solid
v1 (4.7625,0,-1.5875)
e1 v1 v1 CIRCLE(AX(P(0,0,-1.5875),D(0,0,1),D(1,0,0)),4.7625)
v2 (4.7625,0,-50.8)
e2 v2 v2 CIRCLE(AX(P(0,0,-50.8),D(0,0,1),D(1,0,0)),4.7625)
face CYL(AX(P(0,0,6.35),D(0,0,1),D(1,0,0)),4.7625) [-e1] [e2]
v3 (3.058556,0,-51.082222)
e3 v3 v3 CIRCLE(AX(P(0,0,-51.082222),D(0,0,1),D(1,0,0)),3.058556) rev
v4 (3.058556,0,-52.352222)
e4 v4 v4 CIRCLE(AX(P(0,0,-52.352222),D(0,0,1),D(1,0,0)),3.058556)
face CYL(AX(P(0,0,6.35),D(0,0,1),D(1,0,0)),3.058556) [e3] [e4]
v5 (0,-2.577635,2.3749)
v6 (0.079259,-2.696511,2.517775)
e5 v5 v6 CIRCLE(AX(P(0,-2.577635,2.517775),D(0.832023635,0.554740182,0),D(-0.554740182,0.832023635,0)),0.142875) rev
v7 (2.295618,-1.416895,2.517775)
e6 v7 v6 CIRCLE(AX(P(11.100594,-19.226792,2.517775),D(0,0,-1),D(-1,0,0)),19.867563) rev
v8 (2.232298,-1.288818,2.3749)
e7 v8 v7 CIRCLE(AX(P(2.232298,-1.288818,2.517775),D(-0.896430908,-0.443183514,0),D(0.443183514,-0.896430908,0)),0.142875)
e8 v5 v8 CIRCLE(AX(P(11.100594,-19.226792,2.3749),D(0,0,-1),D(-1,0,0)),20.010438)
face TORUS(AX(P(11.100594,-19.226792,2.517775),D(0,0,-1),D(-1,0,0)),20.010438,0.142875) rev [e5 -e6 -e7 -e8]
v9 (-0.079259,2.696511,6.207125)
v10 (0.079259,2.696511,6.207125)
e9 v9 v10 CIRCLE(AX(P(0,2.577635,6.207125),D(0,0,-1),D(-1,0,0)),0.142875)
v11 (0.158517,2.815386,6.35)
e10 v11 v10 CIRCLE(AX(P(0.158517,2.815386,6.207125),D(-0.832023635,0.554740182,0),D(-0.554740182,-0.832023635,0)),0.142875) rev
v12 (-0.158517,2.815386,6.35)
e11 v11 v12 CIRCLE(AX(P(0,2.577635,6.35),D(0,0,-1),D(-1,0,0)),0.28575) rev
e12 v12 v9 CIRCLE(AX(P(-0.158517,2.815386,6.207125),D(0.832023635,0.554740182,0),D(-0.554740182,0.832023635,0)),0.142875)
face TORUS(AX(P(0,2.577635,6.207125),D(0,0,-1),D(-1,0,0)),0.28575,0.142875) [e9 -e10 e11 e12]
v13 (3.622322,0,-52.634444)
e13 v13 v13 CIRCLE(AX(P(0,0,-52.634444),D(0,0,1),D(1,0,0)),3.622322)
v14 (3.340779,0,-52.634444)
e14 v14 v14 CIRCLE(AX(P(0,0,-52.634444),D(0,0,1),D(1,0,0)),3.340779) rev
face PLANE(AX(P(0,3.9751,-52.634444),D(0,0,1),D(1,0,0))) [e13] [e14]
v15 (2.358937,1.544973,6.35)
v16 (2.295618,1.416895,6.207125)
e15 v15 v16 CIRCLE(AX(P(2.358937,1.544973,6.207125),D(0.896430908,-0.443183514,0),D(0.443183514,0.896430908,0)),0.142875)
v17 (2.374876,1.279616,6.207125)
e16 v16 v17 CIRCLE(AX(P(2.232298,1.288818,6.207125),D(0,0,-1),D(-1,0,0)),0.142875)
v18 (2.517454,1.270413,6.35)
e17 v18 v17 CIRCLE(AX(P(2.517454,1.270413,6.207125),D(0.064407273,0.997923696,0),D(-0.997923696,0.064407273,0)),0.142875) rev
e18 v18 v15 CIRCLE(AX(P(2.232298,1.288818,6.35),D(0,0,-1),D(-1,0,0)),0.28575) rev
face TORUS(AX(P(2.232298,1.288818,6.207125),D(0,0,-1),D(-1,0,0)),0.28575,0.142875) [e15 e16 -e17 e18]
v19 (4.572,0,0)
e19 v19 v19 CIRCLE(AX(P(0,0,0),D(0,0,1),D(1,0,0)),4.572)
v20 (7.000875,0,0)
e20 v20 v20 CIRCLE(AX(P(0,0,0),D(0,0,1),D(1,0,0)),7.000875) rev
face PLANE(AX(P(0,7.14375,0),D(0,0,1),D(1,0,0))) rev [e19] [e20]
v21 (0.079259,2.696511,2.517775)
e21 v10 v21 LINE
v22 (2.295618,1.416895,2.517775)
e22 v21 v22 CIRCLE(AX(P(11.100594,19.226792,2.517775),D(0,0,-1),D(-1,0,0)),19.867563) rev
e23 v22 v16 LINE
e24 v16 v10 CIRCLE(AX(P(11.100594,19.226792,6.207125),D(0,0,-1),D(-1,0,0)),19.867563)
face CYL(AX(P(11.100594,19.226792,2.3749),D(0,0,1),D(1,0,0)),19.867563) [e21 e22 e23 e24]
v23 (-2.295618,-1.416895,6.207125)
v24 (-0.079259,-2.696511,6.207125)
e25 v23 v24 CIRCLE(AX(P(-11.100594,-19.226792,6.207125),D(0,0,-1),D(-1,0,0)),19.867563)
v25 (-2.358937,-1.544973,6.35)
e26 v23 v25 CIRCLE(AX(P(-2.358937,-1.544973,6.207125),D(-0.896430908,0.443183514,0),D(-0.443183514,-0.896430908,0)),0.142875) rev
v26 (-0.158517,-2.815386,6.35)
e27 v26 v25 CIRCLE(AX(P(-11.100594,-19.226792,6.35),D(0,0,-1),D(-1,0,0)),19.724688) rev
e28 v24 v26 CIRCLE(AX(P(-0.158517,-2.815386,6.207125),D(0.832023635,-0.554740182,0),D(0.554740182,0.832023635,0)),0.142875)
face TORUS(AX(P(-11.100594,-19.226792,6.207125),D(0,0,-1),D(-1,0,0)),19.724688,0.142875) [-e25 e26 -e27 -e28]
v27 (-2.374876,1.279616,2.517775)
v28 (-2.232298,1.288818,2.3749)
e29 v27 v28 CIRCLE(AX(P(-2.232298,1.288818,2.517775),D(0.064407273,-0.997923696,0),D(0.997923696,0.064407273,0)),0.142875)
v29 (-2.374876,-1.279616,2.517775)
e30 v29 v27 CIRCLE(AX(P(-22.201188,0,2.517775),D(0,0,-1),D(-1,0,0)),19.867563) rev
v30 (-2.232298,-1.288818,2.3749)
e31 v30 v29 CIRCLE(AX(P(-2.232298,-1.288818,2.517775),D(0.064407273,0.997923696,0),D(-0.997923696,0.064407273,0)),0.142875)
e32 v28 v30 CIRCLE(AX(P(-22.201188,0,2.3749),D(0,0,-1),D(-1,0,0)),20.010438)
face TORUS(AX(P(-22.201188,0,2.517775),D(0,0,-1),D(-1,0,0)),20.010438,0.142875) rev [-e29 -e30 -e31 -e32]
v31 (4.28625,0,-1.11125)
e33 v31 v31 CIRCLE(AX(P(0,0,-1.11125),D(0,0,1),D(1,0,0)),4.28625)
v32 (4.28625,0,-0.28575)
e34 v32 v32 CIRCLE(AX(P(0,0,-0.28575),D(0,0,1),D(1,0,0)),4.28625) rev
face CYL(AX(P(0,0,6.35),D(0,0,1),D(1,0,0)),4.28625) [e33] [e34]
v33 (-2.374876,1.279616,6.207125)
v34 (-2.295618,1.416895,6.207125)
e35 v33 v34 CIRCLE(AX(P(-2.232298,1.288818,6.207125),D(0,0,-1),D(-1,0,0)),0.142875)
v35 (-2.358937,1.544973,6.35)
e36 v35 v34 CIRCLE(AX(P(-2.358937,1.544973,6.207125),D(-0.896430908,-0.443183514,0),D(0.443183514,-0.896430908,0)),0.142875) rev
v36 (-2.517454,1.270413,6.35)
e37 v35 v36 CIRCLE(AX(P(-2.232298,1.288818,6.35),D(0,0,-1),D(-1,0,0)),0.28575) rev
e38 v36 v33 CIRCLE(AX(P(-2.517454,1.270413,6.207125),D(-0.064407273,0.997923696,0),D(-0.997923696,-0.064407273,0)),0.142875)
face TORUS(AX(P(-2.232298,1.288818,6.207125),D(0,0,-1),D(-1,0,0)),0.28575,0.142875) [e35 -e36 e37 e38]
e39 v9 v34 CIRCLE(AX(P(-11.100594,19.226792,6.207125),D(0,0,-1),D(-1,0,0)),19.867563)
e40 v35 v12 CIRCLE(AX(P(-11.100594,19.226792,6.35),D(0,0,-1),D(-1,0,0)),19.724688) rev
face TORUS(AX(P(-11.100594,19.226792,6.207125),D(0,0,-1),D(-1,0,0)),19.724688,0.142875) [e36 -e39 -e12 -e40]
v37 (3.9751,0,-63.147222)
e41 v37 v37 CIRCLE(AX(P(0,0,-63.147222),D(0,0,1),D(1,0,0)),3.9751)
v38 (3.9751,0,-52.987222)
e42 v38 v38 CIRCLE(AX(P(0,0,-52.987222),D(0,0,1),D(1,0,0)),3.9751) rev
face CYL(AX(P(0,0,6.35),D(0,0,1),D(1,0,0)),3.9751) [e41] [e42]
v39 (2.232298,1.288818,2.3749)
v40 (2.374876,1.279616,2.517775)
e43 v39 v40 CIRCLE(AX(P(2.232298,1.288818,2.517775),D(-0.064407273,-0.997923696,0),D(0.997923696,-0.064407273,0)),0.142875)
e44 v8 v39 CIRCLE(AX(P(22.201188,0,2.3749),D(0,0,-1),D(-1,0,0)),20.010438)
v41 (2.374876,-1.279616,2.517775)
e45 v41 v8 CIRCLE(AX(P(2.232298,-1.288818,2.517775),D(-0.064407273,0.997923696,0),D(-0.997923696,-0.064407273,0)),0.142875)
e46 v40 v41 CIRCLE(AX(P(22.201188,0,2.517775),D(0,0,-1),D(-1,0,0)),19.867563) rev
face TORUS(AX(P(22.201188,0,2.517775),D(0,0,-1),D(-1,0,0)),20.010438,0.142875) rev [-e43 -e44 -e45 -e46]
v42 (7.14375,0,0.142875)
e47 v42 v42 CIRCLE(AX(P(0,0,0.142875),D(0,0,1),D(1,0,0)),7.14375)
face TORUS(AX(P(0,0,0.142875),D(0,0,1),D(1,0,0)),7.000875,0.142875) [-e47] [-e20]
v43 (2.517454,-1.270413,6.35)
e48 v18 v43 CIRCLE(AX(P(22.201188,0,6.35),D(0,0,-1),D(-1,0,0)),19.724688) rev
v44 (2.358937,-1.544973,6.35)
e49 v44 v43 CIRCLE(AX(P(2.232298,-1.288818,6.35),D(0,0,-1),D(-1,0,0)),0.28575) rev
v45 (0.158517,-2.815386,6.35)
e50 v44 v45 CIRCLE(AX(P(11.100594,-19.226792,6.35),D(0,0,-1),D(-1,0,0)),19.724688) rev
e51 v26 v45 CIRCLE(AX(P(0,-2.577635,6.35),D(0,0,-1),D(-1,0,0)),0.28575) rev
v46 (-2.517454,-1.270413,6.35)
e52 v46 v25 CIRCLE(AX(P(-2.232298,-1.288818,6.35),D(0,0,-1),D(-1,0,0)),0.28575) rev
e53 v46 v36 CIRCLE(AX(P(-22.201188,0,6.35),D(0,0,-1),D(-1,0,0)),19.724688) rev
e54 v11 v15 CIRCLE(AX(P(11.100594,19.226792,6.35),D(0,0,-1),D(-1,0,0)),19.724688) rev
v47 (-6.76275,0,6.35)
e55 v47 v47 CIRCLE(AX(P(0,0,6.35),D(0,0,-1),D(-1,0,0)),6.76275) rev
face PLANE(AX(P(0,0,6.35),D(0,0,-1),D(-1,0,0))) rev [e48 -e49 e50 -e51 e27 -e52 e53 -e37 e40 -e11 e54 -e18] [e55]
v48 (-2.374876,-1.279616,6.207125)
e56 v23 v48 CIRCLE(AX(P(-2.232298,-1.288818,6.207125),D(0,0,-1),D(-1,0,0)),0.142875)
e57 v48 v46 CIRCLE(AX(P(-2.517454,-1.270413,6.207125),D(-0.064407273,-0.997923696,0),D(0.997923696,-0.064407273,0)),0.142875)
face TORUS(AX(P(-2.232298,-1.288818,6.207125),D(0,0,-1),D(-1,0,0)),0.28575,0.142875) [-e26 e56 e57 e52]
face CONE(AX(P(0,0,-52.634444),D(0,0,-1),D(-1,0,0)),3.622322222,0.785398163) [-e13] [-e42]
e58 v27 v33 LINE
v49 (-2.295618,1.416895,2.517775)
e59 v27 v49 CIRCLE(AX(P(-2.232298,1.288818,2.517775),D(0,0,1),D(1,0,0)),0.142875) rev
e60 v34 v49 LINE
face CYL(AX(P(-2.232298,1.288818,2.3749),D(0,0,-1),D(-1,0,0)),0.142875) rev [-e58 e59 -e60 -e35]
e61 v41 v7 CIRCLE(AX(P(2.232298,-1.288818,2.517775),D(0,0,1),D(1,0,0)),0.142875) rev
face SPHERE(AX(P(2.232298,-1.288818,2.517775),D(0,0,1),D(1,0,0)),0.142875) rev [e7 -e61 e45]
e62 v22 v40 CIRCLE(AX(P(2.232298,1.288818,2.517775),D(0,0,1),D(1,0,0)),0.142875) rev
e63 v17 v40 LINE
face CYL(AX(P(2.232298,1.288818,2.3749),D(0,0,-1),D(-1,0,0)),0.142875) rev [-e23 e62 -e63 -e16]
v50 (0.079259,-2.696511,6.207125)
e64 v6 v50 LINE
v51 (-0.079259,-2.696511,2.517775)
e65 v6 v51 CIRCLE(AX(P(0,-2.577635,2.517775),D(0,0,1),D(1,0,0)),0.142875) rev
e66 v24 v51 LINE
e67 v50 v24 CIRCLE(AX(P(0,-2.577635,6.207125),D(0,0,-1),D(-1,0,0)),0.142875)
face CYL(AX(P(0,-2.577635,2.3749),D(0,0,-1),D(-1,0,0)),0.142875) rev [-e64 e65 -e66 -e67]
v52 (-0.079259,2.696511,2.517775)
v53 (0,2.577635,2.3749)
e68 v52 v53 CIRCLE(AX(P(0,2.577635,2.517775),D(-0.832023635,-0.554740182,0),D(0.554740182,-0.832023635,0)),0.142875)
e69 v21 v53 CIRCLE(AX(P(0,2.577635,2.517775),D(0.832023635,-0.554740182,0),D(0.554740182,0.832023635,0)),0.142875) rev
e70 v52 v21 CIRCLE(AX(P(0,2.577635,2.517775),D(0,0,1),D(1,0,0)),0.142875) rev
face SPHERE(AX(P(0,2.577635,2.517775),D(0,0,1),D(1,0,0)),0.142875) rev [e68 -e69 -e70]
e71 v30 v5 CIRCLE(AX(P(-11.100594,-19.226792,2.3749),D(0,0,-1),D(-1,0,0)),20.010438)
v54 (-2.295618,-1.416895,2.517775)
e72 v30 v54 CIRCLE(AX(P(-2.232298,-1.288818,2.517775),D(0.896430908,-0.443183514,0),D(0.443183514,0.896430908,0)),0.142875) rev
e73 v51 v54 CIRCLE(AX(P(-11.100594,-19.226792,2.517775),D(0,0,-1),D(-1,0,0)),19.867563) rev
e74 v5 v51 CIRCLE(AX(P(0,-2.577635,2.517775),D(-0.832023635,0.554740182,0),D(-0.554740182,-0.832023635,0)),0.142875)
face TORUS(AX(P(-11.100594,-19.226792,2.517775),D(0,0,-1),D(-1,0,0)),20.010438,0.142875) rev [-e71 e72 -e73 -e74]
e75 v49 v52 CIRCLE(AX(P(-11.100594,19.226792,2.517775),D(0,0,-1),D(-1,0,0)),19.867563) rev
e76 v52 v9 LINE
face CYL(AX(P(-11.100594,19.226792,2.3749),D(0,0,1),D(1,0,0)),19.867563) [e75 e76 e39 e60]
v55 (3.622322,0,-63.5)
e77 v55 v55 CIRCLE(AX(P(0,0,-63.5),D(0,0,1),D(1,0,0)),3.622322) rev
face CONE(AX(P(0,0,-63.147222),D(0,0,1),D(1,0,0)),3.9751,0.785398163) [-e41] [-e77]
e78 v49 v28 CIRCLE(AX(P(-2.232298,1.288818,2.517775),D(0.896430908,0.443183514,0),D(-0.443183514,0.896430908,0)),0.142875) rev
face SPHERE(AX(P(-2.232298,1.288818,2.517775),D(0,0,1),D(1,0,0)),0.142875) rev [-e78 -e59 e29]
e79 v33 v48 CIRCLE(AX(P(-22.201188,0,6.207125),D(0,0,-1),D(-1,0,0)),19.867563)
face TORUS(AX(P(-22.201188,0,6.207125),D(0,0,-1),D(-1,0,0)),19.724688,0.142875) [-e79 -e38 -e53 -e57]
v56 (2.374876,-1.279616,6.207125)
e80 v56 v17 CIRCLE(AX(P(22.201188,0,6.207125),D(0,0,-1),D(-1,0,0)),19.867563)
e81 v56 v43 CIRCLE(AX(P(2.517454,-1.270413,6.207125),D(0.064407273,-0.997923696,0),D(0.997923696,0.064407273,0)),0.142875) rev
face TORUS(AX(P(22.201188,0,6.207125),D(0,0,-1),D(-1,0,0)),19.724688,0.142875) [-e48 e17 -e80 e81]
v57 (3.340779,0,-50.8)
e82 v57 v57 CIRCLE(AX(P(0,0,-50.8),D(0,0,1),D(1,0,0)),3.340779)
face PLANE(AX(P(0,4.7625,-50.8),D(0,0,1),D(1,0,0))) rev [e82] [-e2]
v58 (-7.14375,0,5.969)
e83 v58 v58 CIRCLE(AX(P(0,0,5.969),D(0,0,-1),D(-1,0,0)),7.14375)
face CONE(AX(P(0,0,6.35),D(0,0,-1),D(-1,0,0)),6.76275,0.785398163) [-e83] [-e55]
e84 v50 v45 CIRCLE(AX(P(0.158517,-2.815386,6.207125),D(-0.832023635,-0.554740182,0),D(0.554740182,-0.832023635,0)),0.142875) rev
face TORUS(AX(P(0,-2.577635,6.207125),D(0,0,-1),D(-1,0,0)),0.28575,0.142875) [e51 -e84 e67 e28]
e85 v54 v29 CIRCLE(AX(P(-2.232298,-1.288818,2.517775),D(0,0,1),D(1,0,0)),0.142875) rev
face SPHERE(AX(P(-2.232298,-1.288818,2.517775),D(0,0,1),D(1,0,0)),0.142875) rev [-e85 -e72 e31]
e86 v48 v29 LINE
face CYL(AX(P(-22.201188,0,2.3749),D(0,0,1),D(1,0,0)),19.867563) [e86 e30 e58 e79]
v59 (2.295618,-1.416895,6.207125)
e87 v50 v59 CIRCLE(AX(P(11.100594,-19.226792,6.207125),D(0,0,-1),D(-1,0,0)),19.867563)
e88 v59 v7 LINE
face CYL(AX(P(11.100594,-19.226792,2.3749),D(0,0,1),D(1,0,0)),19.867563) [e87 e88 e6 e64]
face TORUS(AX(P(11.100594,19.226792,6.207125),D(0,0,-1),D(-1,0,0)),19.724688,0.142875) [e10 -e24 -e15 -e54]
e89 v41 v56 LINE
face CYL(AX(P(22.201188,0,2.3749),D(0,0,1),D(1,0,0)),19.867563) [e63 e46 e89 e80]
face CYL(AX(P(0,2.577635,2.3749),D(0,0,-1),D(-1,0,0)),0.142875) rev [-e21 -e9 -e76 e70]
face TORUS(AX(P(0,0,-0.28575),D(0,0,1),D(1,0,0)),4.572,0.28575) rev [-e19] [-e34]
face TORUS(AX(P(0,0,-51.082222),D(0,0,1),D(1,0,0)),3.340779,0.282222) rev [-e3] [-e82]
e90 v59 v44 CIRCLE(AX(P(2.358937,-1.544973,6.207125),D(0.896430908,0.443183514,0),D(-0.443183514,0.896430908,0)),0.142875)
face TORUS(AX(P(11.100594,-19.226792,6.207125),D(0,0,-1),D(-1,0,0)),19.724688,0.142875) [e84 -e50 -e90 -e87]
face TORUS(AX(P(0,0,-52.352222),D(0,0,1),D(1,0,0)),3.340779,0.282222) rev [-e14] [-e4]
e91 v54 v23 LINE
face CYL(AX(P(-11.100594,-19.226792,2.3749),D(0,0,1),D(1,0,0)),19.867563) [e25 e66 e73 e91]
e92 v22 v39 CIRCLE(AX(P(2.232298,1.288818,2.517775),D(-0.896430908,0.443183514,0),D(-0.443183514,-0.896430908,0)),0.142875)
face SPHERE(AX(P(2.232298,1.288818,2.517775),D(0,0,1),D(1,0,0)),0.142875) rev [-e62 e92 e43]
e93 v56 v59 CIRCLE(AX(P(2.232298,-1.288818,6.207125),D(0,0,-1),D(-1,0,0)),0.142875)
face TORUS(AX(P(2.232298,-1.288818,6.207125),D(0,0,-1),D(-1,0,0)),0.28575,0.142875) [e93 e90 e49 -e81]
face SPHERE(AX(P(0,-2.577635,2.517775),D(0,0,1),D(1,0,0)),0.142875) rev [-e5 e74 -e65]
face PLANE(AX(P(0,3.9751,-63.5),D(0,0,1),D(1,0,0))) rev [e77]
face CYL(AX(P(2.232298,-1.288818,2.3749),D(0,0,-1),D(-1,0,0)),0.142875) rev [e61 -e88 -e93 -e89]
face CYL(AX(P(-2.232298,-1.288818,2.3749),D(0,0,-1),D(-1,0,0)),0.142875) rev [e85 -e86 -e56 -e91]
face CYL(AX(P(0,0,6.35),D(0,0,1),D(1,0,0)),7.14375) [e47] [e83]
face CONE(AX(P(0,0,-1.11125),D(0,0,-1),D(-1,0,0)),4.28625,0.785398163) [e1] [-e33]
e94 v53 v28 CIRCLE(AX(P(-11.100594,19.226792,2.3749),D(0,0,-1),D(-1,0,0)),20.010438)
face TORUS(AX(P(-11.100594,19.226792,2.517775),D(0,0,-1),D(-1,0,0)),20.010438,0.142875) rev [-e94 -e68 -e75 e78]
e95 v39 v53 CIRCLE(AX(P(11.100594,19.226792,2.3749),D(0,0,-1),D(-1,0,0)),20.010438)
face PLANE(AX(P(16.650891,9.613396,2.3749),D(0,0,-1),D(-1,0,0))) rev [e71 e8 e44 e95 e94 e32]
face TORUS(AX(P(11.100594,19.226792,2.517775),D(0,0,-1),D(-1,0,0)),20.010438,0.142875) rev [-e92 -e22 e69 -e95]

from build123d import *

# Parameters (mm, degrees)
SKETCH4_W          = 1.5875
SKETCH4_H          = 0.47625
SKETCH4_W_2        = 1.834444444
SKETCH4_H_2        = 0.916543552
CHAMFER1_SIZE      = 0.47625
FILLET1_R          = 0.28575
FILLET2_R          = 0.282222222
CHAMFER2_SIZE      = 0.352777778
CHAMFER3_SIZE      = 0.381
CUT_EXTRUDE1_DEPTH = 3.9751
FILLET4_R          = 0.142875


with BuildPart() as part:
    # Sketch3 → Revolve1 (revolve)
    with BuildSketch(Plane(origin=(0, 0, 0), x_dir=(0, 0, -1), z_dir=(1, 0, 0)), mode=Mode.PRIVATE) as revolve1_sk:
        Polygon((-6.35, 7.14375), (0, 7.14375), (0, 4.7625), (50.8, 4.7625), (50.8, 3.9751), (63.5, 3.9751), (63.5, 0), (-6.35, 0), align=None)
    revolve(revolve1_sk.sketch.rotate(Axis((0, 0, 6.35), (0, 0, -1)), 90), axis=Axis((0, 0, 6.35), (0, 0, -1)))

    # Sketch4 → Cut-Revolve1 (revolve, cut)
    with BuildSketch(Plane(origin=(0, 0, 0), x_dir=(0, 0, -1), z_dir=(1, 0, 0)), mode=Mode.PRIVATE) as cut_revolve1_sk:
        with Locations((0.79375, 4.524375)):
            Rectangle(SKETCH4_W, SKETCH4_H)
        with Locations((51.717222222, 3.516828224)):
            Rectangle(SKETCH4_W_2, SKETCH4_H_2)
    revolve(cut_revolve1_sk.sketch.rotate(Axis((0, 0, 6.35), (0, 0, -1)), 90), axis=Axis((0, 0, 6.35), (0, 0, -1)), mode=Mode.SUBTRACT)

    # Chamfer1
    chamfer1_edges = [part.edges().sort_by_distance(p)[0] for p in [
        (-4.28625, 0, -1.5875),
    ]]
    chamfer(chamfer1_edges, length=CHAMFER1_SIZE - 0.0001)  # a hair under: the kernel refuses the full size

    # Fillet1
    fillet1_edges = [part.edges().sort_by_distance(p)[0] for p in [
        (-4.28625, 0, 0),
    ]]
    fillet(fillet1_edges, radius=FILLET1_R)

    # Fillet2
    fillet2_edges = [part.edges().sort_by_distance(p)[0] for p in [
        (-3.058556448, 0, -50.8),
        (-3.058556448, 0, -52.634444444),
    ]]
    fillet(fillet2_edges, radius=FILLET2_R)

    # Chamfer2
    chamfer2_edges = [part.edges().sort_by_distance(p)[0] for p in [
        (-3.9751, 0, -52.634444444),
        (-3.9751, 0, -63.5),
    ]]
    chamfer(chamfer2_edges, length=CHAMFER2_SIZE)

    # Chamfer3
    chamfer3_edges = [part.edges().sort_by_distance(p)[0] for p in [
        (-7.14375, 0, 6.35),
    ]]
    chamfer(chamfer3_edges, length=CHAMFER3_SIZE)

    # Sketch5 → Cut-Extrude1 (cut)
    with BuildSketch(Plane.XY.offset(6.35)):
        with BuildLine():
            ThreePointArc((2.38125, 1.374815329), (1.1668125, 2.020978533), (0, 2.749630657))
            ThreePointArc((0, 2.749630657), (-1.1668125, 2.020978533), (-2.38125, 1.374815329))
            ThreePointArc((-2.38125, 1.374815329), (-2.333625, 0), (-2.38125, -1.374815329))
            ThreePointArc((-2.38125, -1.374815329), (-1.1668125, -2.020978533), (0, -2.749630657))
            ThreePointArc((0, -2.749630657), (1.1668125, -2.020978533), (2.38125, -1.374815329))
            ThreePointArc((2.38125, -1.374815329), (2.333625, 0), (2.38125, 1.374815329))
        make_face()
    extrude(amount=-CUT_EXTRUDE1_DEPTH, mode=Mode.SUBTRACT)

    # Fillet4
    fillet4_edges = [part.edges().sort_by_distance(p)[0] for p in [
        (2.333625, 0, 2.3749),
        (2.38125, 1.374815329, 4.36245),
        (1.1668125, -2.020978533, 2.3749),
        (2.38125, -1.374815329, 4.36245),
        (-1.1668125, -2.020978533, 2.3749),
        (0, -2.749630657, 4.36245),
        (-2.333625, 0, 2.3749),
        (-2.38125, -1.374815329, 4.36245),
        (-1.1668125, 2.020978533, 2.3749),
        (-2.38125, 1.374815329, 4.36245),
        (1.1668125, 2.020978533, 2.3749),
        (0, 2.749630657, 4.36245),
        (2.333625, 0, 6.35),
        (1.1668125, 2.020978533, 6.35),
        (-1.1668125, 2.020978533, 6.35),
        (-2.333625, 0, 6.35),
        (-1.1668125, -2.020978533, 6.35),
        (1.1668125, -2.020978533, 6.35),
        (-7.14375, 0, 0),
    ]]
    fillet(fillet4_edges, radius=FILLET4_R)


solid = part.part
